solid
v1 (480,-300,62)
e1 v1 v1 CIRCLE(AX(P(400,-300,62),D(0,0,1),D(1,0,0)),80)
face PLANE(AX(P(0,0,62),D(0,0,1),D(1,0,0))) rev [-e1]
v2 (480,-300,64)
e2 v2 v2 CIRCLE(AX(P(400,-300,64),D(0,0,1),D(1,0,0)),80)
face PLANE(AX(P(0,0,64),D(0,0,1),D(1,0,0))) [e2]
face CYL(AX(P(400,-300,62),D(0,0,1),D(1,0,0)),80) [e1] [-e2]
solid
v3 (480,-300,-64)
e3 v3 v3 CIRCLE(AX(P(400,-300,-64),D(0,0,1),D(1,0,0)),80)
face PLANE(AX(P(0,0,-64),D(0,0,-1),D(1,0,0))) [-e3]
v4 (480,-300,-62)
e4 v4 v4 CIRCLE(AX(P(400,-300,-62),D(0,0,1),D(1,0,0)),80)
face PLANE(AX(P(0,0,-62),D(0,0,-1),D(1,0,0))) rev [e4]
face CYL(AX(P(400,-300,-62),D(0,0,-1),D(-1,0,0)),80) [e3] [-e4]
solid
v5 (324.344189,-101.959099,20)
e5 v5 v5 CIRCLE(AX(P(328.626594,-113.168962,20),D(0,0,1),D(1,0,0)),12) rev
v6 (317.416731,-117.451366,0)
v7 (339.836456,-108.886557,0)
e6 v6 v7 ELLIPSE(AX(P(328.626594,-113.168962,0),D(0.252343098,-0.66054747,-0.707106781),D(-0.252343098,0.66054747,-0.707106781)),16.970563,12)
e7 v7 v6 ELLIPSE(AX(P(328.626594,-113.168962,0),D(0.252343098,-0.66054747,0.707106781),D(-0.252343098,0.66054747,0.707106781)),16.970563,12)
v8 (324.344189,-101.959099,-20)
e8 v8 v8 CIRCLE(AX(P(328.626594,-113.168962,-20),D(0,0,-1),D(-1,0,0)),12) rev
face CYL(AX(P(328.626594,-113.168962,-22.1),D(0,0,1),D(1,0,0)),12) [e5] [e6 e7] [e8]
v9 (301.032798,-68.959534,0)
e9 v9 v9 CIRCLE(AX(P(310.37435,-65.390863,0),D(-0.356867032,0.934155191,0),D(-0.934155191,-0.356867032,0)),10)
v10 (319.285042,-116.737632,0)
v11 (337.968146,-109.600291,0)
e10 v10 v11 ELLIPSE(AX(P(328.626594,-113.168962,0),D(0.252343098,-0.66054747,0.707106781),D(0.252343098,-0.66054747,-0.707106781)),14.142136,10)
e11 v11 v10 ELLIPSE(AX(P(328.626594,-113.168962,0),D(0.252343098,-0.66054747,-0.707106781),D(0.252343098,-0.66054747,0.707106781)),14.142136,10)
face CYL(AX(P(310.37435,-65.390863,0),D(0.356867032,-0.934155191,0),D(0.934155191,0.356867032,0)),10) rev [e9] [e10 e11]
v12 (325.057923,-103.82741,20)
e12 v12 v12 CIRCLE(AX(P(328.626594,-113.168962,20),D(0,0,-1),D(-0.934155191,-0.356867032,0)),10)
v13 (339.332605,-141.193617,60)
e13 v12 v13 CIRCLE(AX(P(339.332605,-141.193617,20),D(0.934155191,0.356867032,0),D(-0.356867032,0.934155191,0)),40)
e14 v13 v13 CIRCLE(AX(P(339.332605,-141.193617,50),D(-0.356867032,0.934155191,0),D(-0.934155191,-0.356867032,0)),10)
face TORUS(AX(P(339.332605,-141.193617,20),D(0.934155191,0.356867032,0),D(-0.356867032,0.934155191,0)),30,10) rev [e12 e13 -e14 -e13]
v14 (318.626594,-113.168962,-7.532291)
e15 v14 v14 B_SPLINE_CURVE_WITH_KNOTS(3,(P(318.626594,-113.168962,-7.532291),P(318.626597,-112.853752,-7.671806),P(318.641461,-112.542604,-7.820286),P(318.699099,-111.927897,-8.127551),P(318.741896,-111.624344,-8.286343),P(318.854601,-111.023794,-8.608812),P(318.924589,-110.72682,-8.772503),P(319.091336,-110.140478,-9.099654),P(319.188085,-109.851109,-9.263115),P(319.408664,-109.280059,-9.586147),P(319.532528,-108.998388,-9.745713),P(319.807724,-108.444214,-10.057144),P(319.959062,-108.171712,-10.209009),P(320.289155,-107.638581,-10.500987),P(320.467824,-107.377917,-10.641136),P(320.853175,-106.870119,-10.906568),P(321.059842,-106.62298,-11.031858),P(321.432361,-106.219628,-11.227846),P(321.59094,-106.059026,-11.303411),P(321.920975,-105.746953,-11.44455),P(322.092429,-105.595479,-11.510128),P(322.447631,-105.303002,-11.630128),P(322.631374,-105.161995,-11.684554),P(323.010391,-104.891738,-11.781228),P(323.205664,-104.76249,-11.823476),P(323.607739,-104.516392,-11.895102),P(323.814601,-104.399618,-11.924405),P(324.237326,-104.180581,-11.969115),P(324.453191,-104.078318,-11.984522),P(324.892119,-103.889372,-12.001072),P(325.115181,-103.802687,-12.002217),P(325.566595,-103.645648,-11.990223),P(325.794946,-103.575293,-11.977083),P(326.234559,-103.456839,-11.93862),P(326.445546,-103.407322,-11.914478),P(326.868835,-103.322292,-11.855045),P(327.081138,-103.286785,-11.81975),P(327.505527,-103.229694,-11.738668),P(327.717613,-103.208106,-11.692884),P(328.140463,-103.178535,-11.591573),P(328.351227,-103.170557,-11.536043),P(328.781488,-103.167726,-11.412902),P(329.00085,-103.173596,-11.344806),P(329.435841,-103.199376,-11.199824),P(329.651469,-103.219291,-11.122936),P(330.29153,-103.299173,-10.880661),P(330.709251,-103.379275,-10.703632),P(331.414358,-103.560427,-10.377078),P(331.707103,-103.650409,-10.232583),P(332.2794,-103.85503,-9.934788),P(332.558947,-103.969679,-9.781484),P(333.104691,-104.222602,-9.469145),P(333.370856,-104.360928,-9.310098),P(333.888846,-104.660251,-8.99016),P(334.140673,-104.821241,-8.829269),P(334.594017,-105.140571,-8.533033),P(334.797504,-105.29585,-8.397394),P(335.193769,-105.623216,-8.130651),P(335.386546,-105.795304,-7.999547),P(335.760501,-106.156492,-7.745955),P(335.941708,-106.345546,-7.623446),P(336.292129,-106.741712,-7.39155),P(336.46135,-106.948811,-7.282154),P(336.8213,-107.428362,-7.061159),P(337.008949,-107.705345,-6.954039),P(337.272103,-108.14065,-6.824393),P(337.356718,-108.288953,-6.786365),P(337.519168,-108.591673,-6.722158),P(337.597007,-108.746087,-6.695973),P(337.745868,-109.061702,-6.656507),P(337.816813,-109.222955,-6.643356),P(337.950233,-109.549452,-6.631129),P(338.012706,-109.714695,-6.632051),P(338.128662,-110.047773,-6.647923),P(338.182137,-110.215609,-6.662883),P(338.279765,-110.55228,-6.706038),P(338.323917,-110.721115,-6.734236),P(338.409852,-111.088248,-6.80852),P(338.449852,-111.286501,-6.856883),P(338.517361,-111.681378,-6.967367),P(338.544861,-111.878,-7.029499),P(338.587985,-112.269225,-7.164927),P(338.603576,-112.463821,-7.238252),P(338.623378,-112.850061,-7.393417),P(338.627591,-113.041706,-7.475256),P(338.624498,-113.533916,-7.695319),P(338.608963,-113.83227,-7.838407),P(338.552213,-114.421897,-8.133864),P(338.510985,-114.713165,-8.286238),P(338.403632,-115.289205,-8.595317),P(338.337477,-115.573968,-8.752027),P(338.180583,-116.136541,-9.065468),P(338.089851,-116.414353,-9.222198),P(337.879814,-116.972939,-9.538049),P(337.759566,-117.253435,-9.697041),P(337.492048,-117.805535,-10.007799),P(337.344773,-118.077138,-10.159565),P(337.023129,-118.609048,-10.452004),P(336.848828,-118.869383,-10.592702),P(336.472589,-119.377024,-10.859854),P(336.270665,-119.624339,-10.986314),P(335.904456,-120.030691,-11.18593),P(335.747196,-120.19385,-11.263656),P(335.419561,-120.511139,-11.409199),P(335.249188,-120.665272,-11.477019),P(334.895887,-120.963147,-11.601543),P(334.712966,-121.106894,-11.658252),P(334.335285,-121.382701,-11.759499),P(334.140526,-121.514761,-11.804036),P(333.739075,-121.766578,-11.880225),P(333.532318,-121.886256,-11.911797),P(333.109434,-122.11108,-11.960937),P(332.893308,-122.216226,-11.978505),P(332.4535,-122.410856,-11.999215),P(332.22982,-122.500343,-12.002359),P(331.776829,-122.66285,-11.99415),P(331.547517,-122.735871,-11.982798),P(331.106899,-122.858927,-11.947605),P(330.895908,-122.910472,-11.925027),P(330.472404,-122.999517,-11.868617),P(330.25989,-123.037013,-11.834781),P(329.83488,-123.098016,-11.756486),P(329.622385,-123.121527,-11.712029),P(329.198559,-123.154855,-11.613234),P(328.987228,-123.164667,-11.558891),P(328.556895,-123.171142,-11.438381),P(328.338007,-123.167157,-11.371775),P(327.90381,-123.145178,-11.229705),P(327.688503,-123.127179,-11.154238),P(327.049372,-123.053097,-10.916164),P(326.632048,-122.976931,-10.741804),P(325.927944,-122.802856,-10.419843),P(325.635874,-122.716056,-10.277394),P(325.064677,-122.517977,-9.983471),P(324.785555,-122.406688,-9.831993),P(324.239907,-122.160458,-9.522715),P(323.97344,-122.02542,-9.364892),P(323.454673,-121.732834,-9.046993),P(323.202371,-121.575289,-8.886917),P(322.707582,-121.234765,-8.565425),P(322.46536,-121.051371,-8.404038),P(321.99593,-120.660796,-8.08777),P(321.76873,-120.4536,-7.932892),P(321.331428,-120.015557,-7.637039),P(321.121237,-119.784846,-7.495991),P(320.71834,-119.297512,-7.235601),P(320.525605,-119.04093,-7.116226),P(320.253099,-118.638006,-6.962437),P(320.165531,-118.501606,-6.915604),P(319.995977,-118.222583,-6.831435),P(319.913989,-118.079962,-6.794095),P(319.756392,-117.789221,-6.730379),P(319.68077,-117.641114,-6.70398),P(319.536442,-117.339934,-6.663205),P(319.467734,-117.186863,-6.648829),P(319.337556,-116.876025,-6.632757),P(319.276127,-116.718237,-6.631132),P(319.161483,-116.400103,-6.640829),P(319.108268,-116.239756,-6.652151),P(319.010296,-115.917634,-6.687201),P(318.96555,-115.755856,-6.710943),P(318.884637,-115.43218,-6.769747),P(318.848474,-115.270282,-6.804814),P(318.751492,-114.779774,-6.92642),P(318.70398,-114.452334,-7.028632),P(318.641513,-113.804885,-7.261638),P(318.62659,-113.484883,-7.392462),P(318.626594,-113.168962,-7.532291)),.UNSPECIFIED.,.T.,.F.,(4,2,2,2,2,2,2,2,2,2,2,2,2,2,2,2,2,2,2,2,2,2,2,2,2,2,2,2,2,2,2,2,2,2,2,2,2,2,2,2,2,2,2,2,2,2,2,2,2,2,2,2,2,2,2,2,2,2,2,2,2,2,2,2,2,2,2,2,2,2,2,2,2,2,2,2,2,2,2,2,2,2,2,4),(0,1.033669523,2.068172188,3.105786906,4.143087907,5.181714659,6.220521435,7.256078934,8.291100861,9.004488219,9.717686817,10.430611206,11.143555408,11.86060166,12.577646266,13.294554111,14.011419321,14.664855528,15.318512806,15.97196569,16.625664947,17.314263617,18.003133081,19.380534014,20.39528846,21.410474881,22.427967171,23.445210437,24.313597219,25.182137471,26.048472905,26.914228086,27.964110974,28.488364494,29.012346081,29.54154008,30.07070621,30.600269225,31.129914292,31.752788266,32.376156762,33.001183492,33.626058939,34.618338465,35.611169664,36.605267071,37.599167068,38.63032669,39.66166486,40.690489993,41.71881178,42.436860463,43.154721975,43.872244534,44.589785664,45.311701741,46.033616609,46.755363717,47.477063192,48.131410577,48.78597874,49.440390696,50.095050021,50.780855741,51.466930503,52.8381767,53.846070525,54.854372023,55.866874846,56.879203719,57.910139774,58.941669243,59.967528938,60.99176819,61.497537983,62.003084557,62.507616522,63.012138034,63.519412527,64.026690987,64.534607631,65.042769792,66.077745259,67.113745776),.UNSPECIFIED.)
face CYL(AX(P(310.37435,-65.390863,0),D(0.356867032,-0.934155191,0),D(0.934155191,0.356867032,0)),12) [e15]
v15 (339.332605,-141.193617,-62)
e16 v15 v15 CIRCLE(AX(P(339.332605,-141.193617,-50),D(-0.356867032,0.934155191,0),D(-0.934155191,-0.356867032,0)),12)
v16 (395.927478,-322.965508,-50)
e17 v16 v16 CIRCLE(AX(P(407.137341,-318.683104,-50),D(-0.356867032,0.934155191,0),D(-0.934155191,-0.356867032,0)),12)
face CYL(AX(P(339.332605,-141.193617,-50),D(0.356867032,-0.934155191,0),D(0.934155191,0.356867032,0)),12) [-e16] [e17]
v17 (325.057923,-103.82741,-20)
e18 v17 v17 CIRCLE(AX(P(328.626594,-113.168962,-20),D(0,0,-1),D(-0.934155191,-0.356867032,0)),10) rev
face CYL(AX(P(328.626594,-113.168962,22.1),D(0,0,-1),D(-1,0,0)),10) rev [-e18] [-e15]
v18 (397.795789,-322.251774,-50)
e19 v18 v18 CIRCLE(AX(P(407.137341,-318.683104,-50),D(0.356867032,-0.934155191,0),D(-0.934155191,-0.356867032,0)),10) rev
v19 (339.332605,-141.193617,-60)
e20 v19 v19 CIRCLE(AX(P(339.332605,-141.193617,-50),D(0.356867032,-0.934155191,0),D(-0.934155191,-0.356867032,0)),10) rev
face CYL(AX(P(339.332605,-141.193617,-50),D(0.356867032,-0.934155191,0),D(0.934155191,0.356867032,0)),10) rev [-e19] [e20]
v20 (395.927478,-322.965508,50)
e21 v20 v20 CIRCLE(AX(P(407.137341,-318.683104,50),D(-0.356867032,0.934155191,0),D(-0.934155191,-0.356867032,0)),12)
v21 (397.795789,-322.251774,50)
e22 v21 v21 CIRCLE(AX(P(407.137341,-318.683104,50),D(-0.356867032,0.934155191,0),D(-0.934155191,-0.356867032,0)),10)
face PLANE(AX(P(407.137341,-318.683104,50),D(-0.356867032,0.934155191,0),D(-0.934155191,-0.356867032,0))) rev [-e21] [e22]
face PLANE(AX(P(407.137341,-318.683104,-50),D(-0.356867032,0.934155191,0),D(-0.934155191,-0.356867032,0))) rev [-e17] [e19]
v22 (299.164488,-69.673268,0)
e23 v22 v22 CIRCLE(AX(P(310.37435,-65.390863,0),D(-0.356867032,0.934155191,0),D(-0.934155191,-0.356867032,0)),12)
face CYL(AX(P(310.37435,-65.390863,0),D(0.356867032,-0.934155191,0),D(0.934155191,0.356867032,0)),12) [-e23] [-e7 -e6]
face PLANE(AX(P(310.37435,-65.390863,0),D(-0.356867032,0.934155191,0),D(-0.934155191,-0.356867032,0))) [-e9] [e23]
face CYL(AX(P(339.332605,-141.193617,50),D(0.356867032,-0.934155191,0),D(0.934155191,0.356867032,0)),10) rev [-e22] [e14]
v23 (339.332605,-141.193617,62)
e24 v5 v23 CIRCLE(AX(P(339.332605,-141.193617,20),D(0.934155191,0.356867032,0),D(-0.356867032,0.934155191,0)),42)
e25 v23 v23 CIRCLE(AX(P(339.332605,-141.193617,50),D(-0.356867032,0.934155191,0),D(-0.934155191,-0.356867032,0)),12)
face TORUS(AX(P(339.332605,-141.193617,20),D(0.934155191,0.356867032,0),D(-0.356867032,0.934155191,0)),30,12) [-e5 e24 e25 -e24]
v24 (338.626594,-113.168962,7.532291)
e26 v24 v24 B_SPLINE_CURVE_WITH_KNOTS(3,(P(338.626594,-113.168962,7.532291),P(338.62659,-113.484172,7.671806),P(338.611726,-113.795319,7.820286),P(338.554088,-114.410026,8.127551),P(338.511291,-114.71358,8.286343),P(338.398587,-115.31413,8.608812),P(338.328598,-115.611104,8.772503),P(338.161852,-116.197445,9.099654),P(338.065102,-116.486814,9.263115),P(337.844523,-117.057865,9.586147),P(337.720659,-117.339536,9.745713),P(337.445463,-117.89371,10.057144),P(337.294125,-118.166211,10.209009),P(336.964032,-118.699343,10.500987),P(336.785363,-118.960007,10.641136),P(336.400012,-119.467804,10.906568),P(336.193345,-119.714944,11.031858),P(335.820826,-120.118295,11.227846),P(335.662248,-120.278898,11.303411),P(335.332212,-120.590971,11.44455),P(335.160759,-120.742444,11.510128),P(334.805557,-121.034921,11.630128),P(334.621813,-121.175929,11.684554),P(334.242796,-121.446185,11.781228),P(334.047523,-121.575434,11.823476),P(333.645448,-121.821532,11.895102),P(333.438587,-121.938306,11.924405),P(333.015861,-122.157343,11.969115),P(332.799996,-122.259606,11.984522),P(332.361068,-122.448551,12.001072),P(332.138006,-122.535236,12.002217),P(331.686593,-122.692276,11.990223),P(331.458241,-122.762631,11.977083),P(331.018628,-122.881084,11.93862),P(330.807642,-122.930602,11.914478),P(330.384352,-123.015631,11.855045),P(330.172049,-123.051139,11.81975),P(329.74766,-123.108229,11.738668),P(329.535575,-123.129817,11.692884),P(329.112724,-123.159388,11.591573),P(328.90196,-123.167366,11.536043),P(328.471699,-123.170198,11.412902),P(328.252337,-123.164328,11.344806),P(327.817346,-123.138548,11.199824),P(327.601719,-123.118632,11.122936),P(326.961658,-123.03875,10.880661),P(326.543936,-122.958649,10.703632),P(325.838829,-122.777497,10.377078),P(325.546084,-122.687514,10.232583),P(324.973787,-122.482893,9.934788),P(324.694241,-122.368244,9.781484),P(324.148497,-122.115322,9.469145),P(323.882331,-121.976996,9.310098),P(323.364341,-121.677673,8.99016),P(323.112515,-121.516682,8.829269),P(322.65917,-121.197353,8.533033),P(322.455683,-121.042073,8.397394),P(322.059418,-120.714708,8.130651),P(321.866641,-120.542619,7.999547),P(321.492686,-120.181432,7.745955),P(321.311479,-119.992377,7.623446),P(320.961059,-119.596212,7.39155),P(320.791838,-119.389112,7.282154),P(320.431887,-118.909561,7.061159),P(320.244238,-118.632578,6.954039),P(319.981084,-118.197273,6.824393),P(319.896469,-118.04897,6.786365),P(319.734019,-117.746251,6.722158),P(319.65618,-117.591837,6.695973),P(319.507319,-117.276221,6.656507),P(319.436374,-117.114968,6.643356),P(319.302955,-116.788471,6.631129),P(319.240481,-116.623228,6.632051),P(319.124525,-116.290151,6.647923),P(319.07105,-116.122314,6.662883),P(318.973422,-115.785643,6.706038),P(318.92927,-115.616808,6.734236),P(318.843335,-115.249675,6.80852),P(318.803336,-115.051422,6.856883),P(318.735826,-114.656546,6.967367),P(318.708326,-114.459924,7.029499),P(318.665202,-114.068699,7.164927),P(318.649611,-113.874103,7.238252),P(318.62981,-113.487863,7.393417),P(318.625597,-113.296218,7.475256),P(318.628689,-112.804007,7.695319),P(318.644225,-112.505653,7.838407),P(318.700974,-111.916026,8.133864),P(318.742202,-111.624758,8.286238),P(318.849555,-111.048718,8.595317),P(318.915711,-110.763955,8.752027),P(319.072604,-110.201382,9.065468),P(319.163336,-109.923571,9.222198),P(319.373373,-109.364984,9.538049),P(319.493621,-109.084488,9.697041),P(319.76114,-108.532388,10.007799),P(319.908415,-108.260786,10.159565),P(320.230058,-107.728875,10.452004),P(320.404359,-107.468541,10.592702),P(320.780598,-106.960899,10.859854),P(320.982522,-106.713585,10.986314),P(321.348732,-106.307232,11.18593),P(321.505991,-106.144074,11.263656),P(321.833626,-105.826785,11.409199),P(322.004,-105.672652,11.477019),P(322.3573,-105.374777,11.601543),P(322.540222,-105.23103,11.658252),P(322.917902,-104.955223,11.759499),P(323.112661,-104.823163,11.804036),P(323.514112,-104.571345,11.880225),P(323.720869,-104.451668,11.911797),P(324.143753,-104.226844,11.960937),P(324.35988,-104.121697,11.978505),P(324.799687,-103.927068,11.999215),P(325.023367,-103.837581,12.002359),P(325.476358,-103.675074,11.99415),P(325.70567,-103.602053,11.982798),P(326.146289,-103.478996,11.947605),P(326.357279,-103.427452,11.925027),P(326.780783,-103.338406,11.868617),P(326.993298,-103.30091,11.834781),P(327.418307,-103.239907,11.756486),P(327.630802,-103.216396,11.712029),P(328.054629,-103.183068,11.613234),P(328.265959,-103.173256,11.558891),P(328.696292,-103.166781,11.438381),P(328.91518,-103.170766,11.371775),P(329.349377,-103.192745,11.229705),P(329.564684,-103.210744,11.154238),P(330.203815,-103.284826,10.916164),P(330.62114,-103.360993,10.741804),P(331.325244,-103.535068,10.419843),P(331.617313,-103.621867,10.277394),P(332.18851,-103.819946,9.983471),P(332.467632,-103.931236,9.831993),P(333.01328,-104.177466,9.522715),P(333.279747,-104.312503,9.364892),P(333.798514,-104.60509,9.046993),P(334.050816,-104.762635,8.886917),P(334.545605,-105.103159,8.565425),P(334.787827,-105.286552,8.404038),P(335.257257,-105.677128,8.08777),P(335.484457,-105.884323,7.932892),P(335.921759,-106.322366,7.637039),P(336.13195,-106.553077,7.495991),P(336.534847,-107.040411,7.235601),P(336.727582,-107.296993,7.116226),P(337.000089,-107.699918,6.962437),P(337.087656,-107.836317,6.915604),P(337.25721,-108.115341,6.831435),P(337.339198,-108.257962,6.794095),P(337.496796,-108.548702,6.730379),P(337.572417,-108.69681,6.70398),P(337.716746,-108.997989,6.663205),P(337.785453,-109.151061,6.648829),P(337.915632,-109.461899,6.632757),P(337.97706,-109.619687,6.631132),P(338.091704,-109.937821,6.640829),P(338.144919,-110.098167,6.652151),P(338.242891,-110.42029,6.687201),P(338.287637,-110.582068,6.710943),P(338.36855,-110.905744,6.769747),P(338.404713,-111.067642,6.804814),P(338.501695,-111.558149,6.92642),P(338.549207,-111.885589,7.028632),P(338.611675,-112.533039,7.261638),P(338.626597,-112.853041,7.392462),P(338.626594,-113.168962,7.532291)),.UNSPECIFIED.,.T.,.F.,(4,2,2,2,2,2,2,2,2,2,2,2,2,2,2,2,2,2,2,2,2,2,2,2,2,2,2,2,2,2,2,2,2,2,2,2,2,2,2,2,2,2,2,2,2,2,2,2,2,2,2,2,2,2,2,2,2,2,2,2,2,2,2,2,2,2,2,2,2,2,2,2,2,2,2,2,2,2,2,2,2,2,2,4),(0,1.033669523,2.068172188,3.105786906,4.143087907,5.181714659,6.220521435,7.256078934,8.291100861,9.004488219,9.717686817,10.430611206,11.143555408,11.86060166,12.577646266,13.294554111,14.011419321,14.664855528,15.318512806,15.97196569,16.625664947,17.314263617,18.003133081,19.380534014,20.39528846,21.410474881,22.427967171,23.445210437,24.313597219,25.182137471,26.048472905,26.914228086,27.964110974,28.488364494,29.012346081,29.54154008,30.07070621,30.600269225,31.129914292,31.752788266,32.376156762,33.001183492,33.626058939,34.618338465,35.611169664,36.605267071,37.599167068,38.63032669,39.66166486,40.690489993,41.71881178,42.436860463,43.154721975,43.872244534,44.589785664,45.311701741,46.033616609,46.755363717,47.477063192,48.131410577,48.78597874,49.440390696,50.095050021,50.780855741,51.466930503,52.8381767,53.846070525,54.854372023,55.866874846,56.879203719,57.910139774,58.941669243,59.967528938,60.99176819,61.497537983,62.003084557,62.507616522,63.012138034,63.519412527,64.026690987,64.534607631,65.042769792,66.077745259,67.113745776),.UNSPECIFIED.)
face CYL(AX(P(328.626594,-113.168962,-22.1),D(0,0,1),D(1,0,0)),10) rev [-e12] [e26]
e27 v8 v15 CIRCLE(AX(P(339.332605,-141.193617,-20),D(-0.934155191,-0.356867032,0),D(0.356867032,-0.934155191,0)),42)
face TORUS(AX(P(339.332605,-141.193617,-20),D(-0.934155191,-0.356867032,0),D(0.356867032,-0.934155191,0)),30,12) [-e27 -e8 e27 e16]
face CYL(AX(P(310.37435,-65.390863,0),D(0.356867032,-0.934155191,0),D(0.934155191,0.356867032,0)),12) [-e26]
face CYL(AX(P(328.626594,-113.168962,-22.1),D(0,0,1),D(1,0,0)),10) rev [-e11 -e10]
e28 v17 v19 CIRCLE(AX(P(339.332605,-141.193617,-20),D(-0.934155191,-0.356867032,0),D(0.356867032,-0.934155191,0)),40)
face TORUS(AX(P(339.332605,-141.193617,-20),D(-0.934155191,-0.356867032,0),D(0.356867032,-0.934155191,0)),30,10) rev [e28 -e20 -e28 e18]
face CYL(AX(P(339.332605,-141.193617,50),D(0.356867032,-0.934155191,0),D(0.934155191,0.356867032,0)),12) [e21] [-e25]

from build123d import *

# Parameters (mm, degrees)
SWEEP_THIN1_PROFILE_R   = 12
SWEEP_THIN1_PROFILE_R_2 = 10
THICKEN1_START          = -64
THICKEN1_OUTLINE_R      = 80
THICKEN1_DEPTH          = 2
THICKEN2_START          = 62
THICKEN2_OUTLINE_R      = 80
THICKEN2_DEPTH          = 2


# Read off the part's stored shape, not the designer's step: Thicken1, Thicken2
with BuildPart() as part:
    # Sweep-Thin1: sweep along a path in Sketch2
    with BuildLine(Plane(origin=(400.0000000000001, -300, 0), x_dir=(0, 0, -1), z_dir=(0.934155191329314, 0.35686703197758807, 0))) as sweep_thin1_path:
        Line((-3.67e-15, 251.14578261144848), (2.59e-15, 200.0000000000001))
        Line((2.59e-15, 200.0000000000001), (-20.000000000000004, 200.0000000000001))
        ThreePointArc((-20.000000000000004, 200.0000000000001), (-41.21320343559641, 191.21320343559654), (-49.999999999999986, 170.0000000000001))
        Line((-49.999999999999986, 170.0000000000001), (-49.99999999999998, -19.99999999999988))
    # Sweep-Thin1 profile (on start of the path) → Sweep-Thin1 (sweep)
    with BuildSketch(Plane(origin=(310.37434996576394, -65.39086339305203, 3.67e-15), x_dir=(-0.934155191329314, -0.35686703197758807, 0), z_dir=(0.35686703197758807, -0.934155191329314, 0))):
        Circle(SWEEP_THIN1_PROFILE_R)
        Circle(SWEEP_THIN1_PROFILE_R_2, mode=Mode.SUBTRACT)
    sweep_thin1 = sweep(path=sweep_thin1_path.line, transition=Transition.RIGHT)

    # Mirror1: Sweep-Thin1 across plane
    add(sweep_thin1.mirror(Plane.XY))


with BuildPart() as body_2:
    # Thicken1 outline → Thicken1 (new body)
    with BuildSketch(Plane.XY.offset(THICKEN1_START)):
        with Locations((400, -300)):
            Circle(THICKEN1_OUTLINE_R)
    extrude(amount=THICKEN1_DEPTH)


with BuildPart() as body_3:
    # Thicken2 outline → Thicken2 (new body)
    with BuildSketch(Plane.XY.offset(THICKEN2_START)):
        with Locations((400, -300)):
            Circle(THICKEN2_OUTLINE_R)
    extrude(amount=THICKEN2_DEPTH)


solid = Compound([part.part, body_2.part, body_3.part])
